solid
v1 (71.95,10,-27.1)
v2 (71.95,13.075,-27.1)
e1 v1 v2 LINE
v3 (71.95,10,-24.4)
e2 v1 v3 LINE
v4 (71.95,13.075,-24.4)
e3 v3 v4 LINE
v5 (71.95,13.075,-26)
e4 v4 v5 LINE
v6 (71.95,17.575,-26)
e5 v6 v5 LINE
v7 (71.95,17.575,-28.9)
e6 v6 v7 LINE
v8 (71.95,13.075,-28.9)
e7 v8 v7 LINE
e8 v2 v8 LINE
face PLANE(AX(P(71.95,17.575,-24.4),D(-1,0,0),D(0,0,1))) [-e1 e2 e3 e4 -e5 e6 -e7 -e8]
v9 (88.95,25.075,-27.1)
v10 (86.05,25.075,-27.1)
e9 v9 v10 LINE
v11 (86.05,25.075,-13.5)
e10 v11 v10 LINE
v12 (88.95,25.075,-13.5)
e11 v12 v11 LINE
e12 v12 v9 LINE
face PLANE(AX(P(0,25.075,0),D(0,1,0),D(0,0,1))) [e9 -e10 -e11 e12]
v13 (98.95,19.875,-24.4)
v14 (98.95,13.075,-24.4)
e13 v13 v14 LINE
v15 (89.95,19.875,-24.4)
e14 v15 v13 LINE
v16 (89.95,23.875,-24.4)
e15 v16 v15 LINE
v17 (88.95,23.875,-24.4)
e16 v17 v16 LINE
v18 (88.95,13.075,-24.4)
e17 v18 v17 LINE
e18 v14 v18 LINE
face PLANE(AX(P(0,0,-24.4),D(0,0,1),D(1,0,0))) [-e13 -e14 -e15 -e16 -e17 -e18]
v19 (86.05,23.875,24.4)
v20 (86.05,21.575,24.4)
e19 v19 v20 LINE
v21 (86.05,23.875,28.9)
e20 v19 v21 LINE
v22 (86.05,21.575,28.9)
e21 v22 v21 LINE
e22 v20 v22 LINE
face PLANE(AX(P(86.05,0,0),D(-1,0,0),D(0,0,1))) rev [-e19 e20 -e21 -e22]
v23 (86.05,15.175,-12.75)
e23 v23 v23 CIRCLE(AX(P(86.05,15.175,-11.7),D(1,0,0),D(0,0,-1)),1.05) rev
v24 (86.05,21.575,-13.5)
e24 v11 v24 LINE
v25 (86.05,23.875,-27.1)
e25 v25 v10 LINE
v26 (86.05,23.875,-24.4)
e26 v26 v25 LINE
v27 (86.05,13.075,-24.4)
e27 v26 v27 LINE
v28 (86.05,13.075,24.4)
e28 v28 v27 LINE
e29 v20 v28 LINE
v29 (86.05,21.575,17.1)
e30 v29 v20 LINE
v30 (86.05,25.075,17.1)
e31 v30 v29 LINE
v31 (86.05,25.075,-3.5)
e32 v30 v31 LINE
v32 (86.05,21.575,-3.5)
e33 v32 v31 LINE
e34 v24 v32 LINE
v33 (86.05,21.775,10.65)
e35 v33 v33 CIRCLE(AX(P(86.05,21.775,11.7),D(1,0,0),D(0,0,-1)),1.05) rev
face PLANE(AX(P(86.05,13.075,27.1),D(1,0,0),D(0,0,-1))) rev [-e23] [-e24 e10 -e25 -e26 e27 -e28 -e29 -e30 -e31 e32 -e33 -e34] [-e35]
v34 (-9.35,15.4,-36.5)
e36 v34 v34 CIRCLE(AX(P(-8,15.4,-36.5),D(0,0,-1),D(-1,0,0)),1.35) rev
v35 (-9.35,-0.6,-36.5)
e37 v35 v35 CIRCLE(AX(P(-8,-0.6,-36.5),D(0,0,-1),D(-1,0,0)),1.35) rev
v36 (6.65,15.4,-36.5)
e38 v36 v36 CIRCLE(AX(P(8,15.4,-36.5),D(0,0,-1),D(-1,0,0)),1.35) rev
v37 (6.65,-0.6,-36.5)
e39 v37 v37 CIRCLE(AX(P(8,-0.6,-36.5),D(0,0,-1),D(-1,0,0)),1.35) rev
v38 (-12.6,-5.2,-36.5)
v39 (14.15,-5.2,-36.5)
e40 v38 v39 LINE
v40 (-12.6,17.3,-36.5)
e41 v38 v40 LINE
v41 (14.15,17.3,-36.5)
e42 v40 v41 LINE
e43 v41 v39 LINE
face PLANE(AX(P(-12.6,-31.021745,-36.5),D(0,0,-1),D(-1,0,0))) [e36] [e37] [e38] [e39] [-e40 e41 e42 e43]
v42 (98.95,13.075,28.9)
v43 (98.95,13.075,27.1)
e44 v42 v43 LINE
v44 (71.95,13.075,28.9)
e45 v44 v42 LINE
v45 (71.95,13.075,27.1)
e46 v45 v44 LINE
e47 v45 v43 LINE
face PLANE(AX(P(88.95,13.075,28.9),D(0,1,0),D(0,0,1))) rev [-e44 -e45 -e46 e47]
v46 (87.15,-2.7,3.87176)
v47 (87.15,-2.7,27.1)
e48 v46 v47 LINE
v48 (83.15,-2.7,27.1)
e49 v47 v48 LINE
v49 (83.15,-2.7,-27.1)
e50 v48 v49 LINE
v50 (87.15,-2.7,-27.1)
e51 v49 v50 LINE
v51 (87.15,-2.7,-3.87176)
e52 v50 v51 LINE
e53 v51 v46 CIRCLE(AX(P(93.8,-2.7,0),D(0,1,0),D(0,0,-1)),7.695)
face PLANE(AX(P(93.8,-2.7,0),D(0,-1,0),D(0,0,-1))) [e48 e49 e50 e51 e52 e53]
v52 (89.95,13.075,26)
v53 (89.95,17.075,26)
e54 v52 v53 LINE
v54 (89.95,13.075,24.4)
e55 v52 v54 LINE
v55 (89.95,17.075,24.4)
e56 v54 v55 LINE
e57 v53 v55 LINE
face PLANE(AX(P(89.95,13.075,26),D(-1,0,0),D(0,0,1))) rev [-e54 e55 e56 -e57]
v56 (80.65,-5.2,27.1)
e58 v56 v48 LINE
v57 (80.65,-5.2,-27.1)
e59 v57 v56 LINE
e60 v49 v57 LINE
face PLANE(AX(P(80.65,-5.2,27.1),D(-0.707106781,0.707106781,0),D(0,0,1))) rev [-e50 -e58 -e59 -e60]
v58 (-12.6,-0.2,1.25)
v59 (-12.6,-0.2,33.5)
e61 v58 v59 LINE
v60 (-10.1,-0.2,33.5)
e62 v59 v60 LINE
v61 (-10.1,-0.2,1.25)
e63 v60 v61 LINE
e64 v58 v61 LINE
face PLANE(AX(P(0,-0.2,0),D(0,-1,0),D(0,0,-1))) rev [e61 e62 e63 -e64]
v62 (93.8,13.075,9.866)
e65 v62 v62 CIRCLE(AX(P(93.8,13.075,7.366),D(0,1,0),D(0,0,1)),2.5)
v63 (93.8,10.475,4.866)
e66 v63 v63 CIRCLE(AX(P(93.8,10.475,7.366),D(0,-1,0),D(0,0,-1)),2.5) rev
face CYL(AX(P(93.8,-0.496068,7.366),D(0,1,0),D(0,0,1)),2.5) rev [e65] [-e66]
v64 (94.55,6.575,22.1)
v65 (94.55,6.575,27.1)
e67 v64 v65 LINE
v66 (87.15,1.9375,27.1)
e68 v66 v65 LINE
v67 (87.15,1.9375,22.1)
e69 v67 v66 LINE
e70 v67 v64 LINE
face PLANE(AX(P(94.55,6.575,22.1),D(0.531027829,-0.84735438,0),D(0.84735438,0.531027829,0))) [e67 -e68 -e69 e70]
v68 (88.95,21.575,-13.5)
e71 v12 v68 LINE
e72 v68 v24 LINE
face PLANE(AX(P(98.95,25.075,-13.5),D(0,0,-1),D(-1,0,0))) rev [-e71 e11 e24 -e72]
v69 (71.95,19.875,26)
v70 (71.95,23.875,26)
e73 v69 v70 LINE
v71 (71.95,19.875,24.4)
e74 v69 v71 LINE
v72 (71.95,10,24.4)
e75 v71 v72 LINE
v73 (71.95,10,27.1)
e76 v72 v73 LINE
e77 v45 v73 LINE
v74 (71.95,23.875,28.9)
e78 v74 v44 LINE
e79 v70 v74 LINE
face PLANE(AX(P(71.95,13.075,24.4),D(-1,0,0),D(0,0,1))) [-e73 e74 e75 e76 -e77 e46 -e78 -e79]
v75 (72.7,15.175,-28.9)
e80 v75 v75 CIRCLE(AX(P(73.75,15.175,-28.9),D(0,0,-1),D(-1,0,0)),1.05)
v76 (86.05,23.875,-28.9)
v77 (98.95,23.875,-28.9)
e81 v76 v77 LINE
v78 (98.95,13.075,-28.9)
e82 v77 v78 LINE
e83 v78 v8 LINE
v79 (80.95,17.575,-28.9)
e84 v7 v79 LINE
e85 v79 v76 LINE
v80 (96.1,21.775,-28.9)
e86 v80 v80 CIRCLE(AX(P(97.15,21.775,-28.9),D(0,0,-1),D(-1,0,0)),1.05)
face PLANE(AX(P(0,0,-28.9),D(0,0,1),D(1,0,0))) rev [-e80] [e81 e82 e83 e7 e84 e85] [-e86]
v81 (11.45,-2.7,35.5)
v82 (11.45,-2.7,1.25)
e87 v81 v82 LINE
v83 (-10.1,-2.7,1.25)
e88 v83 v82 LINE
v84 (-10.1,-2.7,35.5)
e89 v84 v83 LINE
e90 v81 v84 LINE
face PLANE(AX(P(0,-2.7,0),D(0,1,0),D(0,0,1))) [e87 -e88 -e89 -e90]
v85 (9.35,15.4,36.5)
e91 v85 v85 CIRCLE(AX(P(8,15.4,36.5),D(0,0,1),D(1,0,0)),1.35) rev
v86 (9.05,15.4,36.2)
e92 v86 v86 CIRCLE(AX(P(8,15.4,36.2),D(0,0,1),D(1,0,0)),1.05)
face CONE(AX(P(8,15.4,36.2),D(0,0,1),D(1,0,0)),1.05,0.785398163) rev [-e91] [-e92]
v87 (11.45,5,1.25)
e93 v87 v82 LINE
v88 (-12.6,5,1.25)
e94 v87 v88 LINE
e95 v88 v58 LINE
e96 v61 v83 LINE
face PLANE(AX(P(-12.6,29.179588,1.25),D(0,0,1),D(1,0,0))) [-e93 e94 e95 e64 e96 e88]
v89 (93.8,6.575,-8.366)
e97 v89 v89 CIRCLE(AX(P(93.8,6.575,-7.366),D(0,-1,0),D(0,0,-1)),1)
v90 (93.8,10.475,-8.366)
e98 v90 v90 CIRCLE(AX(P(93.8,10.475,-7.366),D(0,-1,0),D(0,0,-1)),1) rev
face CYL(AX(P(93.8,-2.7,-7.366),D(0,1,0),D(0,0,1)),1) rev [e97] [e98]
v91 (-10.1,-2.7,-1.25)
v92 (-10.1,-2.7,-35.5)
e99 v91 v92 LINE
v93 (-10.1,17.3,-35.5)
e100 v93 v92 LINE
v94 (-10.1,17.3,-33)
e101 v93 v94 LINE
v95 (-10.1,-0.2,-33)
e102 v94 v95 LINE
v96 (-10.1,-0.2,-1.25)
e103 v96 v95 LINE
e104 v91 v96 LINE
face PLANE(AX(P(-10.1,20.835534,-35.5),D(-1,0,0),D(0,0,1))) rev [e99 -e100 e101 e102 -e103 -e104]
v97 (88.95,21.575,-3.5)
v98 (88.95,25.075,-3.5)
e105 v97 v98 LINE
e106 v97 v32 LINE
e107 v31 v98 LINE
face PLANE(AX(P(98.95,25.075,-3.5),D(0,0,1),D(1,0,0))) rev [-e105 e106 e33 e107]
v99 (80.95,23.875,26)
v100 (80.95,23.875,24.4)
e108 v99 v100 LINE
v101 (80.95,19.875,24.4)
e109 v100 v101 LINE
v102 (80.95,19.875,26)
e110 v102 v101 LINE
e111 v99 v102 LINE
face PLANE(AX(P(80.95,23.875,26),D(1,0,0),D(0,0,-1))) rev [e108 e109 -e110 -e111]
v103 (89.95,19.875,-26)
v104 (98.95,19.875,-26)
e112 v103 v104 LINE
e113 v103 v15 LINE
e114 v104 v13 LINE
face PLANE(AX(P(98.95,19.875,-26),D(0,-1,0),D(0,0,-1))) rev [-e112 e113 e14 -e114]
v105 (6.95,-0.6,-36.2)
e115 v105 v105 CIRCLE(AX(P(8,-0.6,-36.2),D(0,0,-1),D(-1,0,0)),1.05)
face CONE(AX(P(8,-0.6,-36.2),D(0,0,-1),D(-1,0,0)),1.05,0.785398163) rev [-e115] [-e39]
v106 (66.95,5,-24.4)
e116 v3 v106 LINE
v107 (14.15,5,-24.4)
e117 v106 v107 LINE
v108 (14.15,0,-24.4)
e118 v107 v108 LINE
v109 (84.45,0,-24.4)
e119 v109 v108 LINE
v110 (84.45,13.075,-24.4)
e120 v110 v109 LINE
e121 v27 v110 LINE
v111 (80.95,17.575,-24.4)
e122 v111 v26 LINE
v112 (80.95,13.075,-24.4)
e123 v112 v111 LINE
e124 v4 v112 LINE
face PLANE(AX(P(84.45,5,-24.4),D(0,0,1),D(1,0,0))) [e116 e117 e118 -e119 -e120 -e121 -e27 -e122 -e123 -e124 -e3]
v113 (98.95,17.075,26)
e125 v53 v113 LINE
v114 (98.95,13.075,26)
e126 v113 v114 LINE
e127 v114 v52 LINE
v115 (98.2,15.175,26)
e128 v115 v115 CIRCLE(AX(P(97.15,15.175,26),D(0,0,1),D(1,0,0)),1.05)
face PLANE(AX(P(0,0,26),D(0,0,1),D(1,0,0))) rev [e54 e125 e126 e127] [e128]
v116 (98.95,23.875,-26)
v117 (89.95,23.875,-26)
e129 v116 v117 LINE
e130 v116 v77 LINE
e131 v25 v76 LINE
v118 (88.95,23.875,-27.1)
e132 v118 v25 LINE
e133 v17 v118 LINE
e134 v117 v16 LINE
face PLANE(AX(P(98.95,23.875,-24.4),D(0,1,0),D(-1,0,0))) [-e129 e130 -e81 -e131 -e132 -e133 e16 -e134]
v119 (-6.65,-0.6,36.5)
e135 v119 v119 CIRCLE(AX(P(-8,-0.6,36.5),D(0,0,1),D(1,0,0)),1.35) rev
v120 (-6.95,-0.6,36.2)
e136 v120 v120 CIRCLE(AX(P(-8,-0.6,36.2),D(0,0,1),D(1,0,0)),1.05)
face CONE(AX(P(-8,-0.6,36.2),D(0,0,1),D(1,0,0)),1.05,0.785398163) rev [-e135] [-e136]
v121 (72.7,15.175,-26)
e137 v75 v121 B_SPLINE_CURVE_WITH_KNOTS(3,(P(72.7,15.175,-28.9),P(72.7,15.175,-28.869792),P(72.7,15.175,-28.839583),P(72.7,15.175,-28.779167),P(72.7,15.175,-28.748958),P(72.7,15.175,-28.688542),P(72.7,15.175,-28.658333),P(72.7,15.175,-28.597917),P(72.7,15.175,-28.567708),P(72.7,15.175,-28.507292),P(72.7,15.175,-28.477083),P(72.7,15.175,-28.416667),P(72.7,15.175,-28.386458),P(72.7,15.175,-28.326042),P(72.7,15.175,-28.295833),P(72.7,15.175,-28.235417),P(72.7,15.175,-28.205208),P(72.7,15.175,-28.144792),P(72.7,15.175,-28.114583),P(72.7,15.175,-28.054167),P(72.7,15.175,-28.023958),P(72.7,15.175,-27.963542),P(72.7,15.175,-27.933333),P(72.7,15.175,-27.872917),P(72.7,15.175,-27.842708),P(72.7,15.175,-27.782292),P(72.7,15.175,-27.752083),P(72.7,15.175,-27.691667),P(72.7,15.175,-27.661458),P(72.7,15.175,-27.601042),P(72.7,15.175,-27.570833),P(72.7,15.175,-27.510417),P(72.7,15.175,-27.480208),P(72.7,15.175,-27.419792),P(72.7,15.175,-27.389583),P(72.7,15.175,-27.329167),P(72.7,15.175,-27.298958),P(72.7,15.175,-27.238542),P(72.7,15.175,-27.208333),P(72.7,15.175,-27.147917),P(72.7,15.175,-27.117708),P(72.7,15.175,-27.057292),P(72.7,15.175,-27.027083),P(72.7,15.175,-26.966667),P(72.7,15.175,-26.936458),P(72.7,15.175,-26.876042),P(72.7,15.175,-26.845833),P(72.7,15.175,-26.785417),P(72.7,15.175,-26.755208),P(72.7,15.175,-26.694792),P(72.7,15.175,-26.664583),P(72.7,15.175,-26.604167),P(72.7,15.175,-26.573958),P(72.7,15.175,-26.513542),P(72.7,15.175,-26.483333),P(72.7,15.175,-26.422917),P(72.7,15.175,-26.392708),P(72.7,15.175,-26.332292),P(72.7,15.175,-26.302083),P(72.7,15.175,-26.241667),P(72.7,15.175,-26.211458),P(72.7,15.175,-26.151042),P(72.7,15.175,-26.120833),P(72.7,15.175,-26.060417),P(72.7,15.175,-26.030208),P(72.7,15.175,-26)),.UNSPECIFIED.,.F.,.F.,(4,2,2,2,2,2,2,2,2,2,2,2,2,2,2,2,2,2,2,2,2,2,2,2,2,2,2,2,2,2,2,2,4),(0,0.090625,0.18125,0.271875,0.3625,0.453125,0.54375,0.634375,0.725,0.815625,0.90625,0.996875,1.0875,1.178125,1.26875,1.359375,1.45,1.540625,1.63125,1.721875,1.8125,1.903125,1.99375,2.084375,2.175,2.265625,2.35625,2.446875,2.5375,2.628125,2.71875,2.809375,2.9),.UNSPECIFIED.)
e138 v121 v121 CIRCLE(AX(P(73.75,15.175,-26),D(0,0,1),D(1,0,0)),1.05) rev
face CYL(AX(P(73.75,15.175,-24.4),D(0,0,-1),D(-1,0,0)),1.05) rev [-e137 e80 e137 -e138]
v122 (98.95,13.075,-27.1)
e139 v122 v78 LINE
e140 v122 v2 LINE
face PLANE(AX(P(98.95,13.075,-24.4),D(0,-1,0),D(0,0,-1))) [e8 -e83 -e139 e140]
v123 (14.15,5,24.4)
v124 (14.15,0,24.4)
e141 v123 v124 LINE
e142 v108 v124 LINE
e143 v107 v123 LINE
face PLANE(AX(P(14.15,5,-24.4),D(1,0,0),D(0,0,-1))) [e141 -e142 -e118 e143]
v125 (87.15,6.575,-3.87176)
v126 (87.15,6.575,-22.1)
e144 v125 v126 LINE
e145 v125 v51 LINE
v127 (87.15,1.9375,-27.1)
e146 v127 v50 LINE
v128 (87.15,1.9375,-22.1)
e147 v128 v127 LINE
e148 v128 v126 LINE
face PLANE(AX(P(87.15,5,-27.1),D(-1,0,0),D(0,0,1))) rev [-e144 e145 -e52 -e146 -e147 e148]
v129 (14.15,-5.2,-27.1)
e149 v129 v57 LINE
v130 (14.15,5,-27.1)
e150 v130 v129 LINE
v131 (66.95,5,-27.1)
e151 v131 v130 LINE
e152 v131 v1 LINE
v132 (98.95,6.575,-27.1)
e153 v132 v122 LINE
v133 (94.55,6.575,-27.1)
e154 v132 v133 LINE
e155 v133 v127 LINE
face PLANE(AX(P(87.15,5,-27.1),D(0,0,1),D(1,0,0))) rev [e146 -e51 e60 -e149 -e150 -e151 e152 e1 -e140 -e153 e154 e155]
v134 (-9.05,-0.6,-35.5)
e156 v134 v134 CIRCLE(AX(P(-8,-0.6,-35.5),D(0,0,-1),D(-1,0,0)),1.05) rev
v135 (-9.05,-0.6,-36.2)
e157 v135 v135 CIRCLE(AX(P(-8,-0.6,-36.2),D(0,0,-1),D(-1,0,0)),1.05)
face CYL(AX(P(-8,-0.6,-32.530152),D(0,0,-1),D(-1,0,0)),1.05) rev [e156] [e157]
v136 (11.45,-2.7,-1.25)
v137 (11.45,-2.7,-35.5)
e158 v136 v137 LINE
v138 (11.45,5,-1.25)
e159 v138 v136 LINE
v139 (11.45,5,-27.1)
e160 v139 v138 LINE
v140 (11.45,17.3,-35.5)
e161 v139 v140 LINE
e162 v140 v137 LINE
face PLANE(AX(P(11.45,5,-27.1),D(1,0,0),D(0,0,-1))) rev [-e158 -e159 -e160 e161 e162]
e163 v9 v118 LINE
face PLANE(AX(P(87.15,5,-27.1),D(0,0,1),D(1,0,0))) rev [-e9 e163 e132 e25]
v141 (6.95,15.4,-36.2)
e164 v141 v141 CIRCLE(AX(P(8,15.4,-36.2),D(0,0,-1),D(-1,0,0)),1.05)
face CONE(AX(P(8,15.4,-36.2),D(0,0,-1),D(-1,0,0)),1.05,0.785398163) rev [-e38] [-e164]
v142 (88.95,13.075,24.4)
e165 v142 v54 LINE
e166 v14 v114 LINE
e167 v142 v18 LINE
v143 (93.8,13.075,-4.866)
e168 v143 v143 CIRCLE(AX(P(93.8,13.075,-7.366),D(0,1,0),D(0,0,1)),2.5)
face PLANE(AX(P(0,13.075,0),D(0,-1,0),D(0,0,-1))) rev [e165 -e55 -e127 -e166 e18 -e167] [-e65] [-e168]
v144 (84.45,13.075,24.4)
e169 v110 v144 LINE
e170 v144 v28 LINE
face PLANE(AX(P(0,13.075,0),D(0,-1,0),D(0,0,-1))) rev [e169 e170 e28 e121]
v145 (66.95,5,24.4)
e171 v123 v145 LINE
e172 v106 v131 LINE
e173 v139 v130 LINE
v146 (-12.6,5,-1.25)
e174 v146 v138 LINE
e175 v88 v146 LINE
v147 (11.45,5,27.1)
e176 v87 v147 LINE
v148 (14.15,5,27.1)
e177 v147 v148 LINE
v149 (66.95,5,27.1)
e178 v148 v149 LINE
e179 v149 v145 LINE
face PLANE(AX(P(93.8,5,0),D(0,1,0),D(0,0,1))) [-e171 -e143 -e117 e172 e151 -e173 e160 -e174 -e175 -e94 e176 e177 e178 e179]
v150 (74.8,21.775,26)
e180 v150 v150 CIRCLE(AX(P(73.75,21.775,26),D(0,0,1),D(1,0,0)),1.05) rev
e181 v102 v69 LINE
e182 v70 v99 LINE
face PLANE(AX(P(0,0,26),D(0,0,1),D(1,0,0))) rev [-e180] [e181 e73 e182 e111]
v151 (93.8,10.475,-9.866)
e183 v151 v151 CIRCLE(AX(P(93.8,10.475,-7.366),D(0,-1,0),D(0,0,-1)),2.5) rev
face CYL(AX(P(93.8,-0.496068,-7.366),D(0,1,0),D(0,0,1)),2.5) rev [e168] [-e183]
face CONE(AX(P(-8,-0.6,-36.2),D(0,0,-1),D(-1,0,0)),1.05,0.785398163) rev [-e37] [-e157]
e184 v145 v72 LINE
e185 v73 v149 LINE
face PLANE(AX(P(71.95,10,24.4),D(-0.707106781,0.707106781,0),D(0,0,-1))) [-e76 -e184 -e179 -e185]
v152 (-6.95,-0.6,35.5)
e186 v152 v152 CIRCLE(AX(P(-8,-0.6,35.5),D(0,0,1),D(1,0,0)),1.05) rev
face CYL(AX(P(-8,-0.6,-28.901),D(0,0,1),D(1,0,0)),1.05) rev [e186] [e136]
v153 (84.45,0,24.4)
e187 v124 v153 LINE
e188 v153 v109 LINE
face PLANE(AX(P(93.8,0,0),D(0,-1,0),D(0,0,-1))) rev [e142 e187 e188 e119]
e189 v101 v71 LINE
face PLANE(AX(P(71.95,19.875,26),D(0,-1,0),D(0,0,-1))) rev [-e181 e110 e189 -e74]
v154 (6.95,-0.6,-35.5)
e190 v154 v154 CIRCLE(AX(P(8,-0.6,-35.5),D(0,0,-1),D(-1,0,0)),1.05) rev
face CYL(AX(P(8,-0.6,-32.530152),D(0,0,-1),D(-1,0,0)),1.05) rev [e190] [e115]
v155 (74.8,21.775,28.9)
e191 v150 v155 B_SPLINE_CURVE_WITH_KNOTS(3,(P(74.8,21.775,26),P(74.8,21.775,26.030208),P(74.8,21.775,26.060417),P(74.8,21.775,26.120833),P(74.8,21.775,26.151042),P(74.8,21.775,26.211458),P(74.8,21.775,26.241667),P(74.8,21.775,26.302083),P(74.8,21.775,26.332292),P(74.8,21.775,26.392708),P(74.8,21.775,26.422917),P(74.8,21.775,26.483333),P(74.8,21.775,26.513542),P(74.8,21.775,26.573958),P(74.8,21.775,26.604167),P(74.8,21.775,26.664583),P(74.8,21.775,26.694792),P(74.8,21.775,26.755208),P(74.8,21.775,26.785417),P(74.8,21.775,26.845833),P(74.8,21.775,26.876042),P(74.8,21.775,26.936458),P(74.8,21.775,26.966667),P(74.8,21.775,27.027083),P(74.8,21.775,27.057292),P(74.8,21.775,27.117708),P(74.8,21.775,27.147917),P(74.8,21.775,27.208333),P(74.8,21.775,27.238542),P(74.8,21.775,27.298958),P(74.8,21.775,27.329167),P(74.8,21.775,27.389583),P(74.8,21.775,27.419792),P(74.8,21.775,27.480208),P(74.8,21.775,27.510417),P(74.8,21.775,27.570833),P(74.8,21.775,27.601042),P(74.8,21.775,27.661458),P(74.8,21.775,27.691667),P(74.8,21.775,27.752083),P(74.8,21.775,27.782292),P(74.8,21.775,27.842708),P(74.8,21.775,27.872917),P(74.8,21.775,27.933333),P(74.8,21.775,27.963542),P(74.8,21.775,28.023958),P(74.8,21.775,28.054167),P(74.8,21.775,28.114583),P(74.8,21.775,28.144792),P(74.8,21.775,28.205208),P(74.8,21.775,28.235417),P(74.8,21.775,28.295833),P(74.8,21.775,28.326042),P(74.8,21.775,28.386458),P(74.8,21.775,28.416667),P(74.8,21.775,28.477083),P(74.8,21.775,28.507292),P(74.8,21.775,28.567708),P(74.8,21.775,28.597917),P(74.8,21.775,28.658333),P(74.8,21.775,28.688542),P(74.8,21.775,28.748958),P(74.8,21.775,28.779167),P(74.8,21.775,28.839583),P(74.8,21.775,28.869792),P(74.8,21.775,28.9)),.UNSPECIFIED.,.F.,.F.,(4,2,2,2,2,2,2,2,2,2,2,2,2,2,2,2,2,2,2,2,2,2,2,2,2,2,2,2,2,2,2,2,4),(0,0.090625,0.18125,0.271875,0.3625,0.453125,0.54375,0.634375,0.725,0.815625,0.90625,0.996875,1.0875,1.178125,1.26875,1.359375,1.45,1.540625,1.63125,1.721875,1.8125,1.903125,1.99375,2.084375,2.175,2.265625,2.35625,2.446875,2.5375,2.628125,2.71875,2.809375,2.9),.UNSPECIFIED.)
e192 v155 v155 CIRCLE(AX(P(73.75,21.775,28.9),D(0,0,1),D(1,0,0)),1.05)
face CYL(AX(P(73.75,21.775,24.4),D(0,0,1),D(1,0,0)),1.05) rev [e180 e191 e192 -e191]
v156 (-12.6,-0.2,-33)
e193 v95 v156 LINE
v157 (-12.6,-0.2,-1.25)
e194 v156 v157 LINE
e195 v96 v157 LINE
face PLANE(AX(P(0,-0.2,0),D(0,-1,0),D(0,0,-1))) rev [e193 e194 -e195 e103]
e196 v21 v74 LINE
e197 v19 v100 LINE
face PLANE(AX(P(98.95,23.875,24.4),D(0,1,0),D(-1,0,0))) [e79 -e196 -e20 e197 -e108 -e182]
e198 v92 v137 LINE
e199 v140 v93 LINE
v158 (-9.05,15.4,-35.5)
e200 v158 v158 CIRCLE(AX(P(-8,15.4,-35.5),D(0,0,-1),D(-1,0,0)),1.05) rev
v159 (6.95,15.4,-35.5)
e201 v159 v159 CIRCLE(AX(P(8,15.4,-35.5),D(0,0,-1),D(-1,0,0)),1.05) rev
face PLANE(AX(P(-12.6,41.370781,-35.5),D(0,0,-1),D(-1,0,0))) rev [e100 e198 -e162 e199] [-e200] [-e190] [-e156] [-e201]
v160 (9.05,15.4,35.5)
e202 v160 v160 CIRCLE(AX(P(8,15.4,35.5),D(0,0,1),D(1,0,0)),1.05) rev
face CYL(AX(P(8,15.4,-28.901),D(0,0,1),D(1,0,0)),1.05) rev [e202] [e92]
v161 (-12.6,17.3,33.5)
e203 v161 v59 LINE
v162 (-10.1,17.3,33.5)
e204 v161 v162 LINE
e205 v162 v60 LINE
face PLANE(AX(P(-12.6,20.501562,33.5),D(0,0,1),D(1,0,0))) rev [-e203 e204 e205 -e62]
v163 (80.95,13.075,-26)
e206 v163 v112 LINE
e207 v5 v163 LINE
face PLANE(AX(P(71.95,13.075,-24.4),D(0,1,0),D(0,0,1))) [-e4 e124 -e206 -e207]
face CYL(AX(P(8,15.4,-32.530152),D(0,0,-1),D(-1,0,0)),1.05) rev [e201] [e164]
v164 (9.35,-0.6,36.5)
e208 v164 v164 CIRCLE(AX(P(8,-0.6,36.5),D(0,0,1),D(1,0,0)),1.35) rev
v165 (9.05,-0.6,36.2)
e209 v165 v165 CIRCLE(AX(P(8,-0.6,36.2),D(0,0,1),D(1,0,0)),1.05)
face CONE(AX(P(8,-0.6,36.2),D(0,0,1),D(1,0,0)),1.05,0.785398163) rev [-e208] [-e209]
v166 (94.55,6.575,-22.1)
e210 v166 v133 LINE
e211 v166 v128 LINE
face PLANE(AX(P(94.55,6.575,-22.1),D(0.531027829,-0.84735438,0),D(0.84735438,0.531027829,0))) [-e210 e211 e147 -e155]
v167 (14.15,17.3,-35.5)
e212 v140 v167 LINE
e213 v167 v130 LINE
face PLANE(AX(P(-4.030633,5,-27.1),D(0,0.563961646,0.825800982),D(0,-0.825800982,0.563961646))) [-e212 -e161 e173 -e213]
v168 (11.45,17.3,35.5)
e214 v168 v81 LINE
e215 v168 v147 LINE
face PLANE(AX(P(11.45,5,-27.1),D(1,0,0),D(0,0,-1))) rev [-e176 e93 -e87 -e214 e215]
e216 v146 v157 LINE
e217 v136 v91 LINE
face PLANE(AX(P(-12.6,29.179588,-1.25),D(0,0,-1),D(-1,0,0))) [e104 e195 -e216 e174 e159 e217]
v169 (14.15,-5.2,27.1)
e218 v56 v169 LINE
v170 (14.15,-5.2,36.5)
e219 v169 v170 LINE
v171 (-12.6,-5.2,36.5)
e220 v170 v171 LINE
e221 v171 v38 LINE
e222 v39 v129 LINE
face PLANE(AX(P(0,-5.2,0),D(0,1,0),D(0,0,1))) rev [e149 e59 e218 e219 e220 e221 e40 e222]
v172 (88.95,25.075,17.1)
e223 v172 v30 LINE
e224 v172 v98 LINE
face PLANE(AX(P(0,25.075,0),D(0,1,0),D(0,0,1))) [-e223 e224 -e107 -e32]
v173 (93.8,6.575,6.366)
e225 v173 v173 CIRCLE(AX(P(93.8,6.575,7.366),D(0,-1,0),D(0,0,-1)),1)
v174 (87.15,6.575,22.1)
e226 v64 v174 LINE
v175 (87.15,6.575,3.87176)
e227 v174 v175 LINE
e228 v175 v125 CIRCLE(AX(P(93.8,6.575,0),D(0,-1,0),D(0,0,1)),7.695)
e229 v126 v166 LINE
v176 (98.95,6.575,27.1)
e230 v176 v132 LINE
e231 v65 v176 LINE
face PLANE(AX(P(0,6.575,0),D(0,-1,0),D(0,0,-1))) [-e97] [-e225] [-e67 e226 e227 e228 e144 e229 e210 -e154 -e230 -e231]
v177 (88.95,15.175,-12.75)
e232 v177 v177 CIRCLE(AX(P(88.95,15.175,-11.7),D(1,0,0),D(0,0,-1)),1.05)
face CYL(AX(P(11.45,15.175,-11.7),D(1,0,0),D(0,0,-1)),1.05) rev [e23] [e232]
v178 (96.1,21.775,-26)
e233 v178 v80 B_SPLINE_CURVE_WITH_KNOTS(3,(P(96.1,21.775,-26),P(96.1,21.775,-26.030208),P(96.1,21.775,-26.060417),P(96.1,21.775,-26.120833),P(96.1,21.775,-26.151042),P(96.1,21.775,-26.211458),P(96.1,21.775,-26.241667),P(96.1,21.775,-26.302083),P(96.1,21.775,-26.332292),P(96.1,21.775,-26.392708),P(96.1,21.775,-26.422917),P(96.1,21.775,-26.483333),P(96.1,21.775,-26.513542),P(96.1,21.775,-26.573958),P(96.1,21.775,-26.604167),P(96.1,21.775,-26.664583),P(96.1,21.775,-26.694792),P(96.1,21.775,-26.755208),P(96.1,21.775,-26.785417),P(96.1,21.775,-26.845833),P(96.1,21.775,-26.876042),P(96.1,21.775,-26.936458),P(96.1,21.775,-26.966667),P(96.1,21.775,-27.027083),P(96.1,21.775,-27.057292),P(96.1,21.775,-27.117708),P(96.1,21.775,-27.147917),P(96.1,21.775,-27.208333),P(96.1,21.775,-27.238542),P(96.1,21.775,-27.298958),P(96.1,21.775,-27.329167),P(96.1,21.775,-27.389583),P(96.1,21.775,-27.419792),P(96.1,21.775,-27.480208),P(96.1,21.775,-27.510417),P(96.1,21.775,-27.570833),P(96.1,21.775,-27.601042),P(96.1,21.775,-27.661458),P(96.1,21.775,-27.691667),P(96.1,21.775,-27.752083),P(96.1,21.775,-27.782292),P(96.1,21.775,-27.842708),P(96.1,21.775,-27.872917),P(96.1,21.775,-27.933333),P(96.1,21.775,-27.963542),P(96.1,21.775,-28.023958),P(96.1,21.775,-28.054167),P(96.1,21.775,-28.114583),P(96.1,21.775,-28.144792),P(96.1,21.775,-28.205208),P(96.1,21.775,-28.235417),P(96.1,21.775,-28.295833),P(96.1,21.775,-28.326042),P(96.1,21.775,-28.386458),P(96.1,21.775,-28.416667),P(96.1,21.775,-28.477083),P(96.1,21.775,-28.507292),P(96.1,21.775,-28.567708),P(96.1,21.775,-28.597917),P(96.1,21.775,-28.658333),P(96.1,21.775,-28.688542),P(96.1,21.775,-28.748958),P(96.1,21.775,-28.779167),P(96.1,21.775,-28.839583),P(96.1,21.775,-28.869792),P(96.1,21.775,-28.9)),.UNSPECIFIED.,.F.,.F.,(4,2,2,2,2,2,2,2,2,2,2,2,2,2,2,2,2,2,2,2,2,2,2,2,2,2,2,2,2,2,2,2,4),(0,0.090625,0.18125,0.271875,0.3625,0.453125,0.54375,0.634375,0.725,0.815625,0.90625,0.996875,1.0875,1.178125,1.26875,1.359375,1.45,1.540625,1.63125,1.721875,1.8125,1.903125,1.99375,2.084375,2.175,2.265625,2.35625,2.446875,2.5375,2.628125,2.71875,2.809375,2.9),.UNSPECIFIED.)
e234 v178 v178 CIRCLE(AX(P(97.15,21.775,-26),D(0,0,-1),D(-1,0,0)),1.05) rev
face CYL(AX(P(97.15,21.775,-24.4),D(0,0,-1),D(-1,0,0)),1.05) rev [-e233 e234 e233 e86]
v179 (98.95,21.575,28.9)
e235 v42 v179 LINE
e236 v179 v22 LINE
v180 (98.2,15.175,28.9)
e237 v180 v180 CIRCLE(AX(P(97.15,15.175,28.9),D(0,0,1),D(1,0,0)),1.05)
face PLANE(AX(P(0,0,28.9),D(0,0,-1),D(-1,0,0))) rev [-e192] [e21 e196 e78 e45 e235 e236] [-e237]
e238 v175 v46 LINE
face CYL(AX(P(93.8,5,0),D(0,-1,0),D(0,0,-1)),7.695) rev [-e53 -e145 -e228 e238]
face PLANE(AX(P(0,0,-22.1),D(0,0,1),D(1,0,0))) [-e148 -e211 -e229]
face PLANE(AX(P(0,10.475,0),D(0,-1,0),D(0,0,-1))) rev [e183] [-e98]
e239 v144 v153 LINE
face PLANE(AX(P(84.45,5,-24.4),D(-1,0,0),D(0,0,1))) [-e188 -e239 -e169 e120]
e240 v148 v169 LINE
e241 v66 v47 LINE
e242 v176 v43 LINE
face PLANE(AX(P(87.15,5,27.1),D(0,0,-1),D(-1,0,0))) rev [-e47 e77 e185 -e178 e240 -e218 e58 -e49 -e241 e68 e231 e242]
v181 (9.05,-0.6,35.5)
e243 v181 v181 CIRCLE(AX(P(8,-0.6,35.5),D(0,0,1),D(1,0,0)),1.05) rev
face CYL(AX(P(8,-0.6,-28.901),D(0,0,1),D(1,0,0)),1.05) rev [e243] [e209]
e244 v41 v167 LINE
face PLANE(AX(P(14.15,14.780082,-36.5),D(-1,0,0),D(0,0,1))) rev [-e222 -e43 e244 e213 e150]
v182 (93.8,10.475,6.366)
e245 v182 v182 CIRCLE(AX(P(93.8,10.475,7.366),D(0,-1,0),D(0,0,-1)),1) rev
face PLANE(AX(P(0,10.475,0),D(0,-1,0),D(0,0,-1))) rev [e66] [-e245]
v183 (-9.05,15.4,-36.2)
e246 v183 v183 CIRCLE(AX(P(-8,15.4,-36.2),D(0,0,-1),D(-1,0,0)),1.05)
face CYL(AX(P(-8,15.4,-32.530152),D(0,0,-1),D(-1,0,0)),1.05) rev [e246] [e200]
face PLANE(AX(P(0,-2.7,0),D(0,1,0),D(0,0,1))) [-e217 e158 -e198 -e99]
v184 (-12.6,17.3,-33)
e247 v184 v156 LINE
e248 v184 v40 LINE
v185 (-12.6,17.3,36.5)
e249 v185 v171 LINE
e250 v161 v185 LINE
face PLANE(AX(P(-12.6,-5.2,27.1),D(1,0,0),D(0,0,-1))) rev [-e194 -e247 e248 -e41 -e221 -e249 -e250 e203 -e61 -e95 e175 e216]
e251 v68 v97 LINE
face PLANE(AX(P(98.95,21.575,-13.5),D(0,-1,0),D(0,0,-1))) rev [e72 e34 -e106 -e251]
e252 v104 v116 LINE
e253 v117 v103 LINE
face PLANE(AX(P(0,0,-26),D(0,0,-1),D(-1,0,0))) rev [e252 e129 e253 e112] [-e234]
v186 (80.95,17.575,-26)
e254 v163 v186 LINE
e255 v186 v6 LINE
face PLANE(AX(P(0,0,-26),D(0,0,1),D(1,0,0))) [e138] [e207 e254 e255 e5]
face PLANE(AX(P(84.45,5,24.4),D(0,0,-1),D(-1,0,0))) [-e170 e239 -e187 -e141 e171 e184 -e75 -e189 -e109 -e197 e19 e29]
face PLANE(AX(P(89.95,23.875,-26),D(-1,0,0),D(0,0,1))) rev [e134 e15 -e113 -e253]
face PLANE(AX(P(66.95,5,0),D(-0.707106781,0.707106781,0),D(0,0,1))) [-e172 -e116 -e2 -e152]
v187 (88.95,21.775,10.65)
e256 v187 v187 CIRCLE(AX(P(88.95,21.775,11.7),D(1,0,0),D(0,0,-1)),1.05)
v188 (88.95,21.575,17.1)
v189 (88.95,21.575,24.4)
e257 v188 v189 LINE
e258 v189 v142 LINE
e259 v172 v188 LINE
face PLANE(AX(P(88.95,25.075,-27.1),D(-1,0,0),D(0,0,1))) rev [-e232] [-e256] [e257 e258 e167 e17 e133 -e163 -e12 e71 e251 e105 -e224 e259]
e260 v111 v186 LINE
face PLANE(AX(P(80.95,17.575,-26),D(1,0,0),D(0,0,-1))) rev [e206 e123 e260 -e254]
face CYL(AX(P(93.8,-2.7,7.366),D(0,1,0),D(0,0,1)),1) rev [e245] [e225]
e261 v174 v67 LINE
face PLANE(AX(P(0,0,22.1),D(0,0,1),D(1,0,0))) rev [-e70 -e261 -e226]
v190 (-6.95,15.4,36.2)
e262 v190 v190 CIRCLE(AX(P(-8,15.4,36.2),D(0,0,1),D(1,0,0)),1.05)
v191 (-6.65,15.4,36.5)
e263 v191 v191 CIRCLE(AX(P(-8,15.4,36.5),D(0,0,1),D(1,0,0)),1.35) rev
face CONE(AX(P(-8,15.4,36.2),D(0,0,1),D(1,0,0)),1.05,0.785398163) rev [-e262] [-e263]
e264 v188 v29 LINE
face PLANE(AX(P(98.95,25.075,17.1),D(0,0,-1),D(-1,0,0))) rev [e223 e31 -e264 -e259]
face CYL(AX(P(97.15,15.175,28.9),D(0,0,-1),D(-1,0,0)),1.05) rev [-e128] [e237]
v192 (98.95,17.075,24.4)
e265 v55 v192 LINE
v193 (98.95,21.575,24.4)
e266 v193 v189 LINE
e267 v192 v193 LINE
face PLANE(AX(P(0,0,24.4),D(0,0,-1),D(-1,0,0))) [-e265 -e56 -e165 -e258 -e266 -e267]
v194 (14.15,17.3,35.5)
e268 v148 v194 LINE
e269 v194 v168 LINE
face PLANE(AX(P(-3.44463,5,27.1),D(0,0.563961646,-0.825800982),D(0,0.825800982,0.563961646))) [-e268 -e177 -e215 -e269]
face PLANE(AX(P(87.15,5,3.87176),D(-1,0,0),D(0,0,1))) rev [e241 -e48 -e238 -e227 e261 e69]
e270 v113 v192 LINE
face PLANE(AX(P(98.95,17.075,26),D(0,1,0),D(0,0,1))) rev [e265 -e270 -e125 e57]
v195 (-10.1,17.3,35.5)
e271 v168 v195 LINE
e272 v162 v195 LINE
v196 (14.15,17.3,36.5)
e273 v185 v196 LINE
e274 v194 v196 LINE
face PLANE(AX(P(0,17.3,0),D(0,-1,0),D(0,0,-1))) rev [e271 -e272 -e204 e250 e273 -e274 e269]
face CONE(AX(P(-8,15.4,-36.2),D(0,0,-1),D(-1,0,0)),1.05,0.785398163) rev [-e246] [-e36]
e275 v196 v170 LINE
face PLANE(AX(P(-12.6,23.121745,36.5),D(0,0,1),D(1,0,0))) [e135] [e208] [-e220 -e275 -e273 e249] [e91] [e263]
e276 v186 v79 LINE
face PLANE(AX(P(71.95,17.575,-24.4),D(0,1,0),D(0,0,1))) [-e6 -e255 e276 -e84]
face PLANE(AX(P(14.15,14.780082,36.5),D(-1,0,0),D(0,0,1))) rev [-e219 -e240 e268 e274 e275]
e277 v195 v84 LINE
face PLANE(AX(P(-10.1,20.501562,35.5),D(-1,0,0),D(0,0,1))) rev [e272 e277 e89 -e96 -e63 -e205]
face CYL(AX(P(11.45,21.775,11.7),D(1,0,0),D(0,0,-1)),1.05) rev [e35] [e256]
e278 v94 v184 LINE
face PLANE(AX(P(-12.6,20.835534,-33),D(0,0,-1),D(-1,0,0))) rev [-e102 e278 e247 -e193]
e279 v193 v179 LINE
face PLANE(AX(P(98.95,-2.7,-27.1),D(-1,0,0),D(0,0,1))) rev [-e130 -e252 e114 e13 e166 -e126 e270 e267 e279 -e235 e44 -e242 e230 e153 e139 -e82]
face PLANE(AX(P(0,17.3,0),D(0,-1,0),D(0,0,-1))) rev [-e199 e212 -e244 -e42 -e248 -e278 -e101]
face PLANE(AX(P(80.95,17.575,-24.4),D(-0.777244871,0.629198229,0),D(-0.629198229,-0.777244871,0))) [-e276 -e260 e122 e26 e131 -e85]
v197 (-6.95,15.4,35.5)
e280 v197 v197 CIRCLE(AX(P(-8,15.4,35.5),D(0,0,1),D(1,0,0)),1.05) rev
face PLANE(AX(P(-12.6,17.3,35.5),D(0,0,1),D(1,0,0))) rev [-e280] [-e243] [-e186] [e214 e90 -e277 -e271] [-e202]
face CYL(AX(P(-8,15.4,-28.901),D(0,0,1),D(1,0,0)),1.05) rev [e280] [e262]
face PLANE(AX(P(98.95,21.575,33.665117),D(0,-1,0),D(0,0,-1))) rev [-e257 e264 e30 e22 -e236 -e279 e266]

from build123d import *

# Parameters (mm, degrees)
SKETCH5_W                 = 70.3
SKETCH5_H                 = 48.8
BOSS_EXTRUDE2_DEPTH       = 5
BOSS_EXTRUDE4_START       = 2.7
BOSS_EXTRUDE4_DEPTH       = 2.7
BOSS_EXTRUDE5_DEPTH       = 1.575
SKETCH8_W                 = 17.5
SKETCH8_H                 = 54.2
BOSS_EXTRUDE6_DEPTH       = 6.5
BOSS_EXTRUDE7_DEPTH       = 54.2
SKETCH10_W                = 70.3
SKETCH10_H                = 48.8
CUT_EXTRUDE1_DEPTH        = 107.297545244
BOSS_EXTRUDE8_DEPTH       = 5
BOSS_EXTRUDE9_DEPTH       = 5
SKETCH13_W                = 4.5
SKETCH13_H                = 54.2
BOSS_EXTRUDE10_DEPTH      = 12
SKETCH15_R                = 1
CUT_EXTRUDE3_DEPTH        = 107.663316679
SKETCH16_R                = 2.5
CUT_EXTRUDE4_DEPTH        = 2.6
SKETCH17_W                = 3
SKETCH17_H                = 54.2
CUT_EXTRUDE5_DEPTH        = 107.663316679
SKETCH18_W                = 10
SKETCH18_H                = 3.5
CUT_EXTRUDE6_DEPTH        = 82.805657659
SKETCH19_R                = 1.05
CUT_EXTRUDE7_DEPTH        = 86.845300541
SKETCH20_W                = 1.6
SKETCH20_H                = 54.2
CUT_EXTRUDE8_DEPTH        = 12
BOSS_EXTRUDE11_DEPTH      = 1.8
BOSS_EXTRUDE11_DEPTH_BACK = 2.7
SKETCH21_W                = 10
SKETCH21_H                = 5
SKETCH21_R                = 1.05
BOSS_EXTRUDE13_DEPTH      = 1.8
BOSS_EXTRUDE13_DEPTH_BACK = 2.7
SKETCH23_W                = 27
SKETCH23_H                = 10.8
SKETCH23_R                = 1.05
CUT_EXTRUDE9_DEPTH        = 84.839880874
SKETCH24_W                = 13.5
SKETCH24_H                = 8.075
BOSS_EXTRUDE14_DEPTH      = 2.7
BOSS_EXTRUDE15_DEPTH      = 1.8
BOSS_EXTRUDE15_DEPTH_BACK = 2.7
SKETCH25_R                = 1.05
SKETCH26_W                = 9
SKETCH26_H                = 4.5
CUT_EXTRUDE10_DEPTH       = 1.6
SKETCH27_W                = 9
SKETCH27_H                = 4
CUT_EXTRUDE11_DEPTH       = 1.6
SKETCH28_W                = 9
SKETCH28_H                = 4
CUT_EXTRUDE12_DEPTH       = 1.6
SKETCH29_W                = 9
SKETCH29_H                = 4
CUT_EXTRUDE13_DEPTH       = 1.6
SKETCH30_W                = 14.720747113
SKETCH30_H                = 8.075
BOSS_EXTRUDE16_DEPTH      = 2.7
SKETCH31_W                = 93.25
SKETCH31_H                = 54.2
BOSS_EXTRUDE17_DEPTH      = 2.5
SKETCH33_W                = 24.05
SKETCH33_H                = 2.5
BOSS_EXTRUDE18_DEPTH      = 10.2
SKETCH36_W                = 24.05
SKETCH36_H                = 9.4
BOSS_EXTRUDE20_DEPTH      = 2.5
SKETCH37_W                = 24.05
SKETCH37_H                = 1
BOSS_EXTRUDE21_DEPTH      = 20
CUT_EXTRUDE14_REACH       = 123.231
SKETCH38_R                = 1.05
BOSS_EXTRUDE22_START      = -2.5
SKETCH39_W                = 2.7
SKETCH39_H                = 9.4
BOSS_EXTRUDE22_DEPTH      = 10.2
SKETCH40_W                = 2.7
SKETCH40_H                = 1
BOSS_EXTRUDE23_DEPTH      = 12.3
BOSS_EXTRUDE24_DEPTH      = 2.7
SKETCH42_W                = 2.5
SKETCH42_H                = 2
BOSS_EXTRUDE25_DEPTH      = 20
SKETCH43_W                = 24.05
SKETCH43_H                = 9.4
BOSS_EXTRUDE26_DEPTH      = 2.5
SKETCH44_W                = 24.05
SKETCH44_H                = 1
BOSS_EXTRUDE27_DEPTH      = 20
BOSS_EXTRUDE30_START      = -2.5
SKETCH45_W                = 2.7
SKETCH45_H                = 9.4
BOSS_EXTRUDE30_DEPTH      = 10.2
BOSS_EXTRUDE31_DEPTH      = 2.7
SKETCH47_W                = 2.5
SKETCH47_H                = 2.5
BOSS_EXTRUDE32_DEPTH      = 20
CUT_EXTRUDE15_START       = -1
SKETCH48_R                = 1.05
CUT_EXTRUDE15_DEPTH       = 1
SKETCH49_W                = 2.5
SKETCH49_H                = 66.5
BOSS_EXTRUDE33_DEPTH      = 2.5
CHAMFER1_SIZE             = 0.3
CHAMFER2_SIZE             = 2.5
CHAMFER3_SIZE             = 5


with BuildPart() as part:
    # Sketch5 → Boss-Extrude2 (new body)
    with BuildSketch(Plane(origin=(0, 0, 0), x_dir=(1, 0, 0), z_dir=(0, 1, 0))):
        with BuildLine():
            Line((87.15, 27.1), (11.45, 27.1))
            Line((11.45, 27.1), (11.45, -27.1))
            Line((11.45, -27.1), (87.15, -27.1))
            Line((87.15, -27.1), (87.15, -3.871759936))
            ThreePointArc((87.15, -3.871759936), (86.105, 0), (87.15, 3.871759936))
            Line((87.15, 3.871759936), (87.15, 27.1))
        make_face()
        with Locations((49.3, 0)):
            Rectangle(SKETCH5_W, SKETCH5_H, mode=Mode.SUBTRACT)
    extrude(amount=BOSS_EXTRUDE2_DEPTH)

    # Sketch6 → Boss-Extrude4 (add)
    with BuildSketch(Plane.XZ.offset(BOSS_EXTRUDE4_START)):
        with BuildLine():
            Line((87.15, -3.871759936), (87.15, -27.1))
            Line((87.15, -27.1), (11.45, -27.1))
            Line((11.45, -27.1), (11.45, 27.1))
            Line((11.45, 27.1), (87.15, 27.1))
            Line((87.15, 27.1), (87.15, 3.871759936))
            ThreePointArc((87.15, 3.871759936), (86.105, 0), (87.15, -3.871759936))
        make_face()
    extrude(amount=-BOSS_EXTRUDE4_DEPTH)

    # Sketch7 → Boss-Extrude5 (add)
    with BuildSketch(Plane(origin=(0, 5, 0), x_dir=(1, 0, 0), z_dir=(0, 1, 0))):
        with BuildLine():
            Line((87.15, -27.1), (79.15, -27.1))
            Line((79.15, -27.1), (79.15, -24.4))
            Line((79.15, -24.4), (84.45, -24.4))
            Line((84.45, -24.4), (84.45, 24.4))
            Line((84.45, 24.4), (79.15, 24.4))
            Line((79.15, 24.4), (79.15, 27.1))
            Line((79.15, 27.1), (87.15, 27.1))
            Line((87.15, 27.1), (87.15, 3.871759936))
            ThreePointArc((87.15, 3.871759936), (86.105, 0), (87.15, -3.871759936))
            Line((87.15, -3.871759936), (87.15, -27.1))
        make_face()
    extrude(amount=BOSS_EXTRUDE5_DEPTH)

    # Sketch8 → Boss-Extrude6 (add)
    with BuildSketch(Plane(origin=(0, 6.575, 0), x_dir=(1, 0, 0), z_dir=(0, 1, 0))):
        with Locations((93.2, 0)):
            Rectangle(SKETCH8_W, SKETCH8_H)
    extrude(amount=BOSS_EXTRUDE6_DEPTH)

    # Sketch9 → Boss-Extrude7 (add, through all)
    with BuildSketch(Plane.XY.offset(27.1)):
        Polygon((84.45, 13.075), (79.15, 6.575), (84.45, 6.575), align=None)
    extrude(amount=-BOSS_EXTRUDE7_DEPTH)

    # Sketch10 → Cut-Extrude1 (cut, through all)
    with BuildSketch(Plane(origin=(0, 0, 0), x_dir=(1, 0, 0), z_dir=(0, 1, 0))):
        with Locations((49.3, 0)):
            Rectangle(SKETCH10_W, SKETCH10_H)
    extrude(amount=CUT_EXTRUDE1_DEPTH, mode=Mode.SUBTRACT)

    # Sketch11 → Boss-Extrude8 (add)
    with BuildSketch(Plane.XY.offset(27.1)):
        Polygon((94.55, 6.575), (87.15, 1.9375), (87.15, 6.575), align=None)
    extrude(amount=-BOSS_EXTRUDE8_DEPTH)

    # Sketch12 → Boss-Extrude9 (add)
    with BuildSketch(Plane(origin=(0, 0, -27.1), x_dir=(-1, 0, 0), z_dir=(0, 0, -1))):
        Polygon((-94.55, 6.575), (-87.15, 1.9375), (-87.15, 6.575), align=None)
    extrude(amount=-BOSS_EXTRUDE9_DEPTH)

    # Sketch13 → Boss-Extrude10 (add)
    with BuildSketch(Plane(origin=(0, 13.075, 0), x_dir=(1, 0, 0), z_dir=(0, 1, 0))):
        with Locations((86.7, 0)):
            Rectangle(SKETCH13_W, SKETCH13_H)
    extrude(amount=BOSS_EXTRUDE10_DEPTH)

    # Sketch15 → Cut-Extrude3 (cut, through all)
    with BuildSketch(Plane(origin=(0, 13.075, 0), x_dir=(1, 0, 0), z_dir=(0, 1, 0))):
        with Locations(Location((93.8, 7.366, 0), (0, 0, 270))):
            Circle(SKETCH15_R)
        with Locations(Location((93.8, -7.366, 0), (0, 0, 270))):
            Circle(SKETCH15_R)
    extrude(amount=-CUT_EXTRUDE3_DEPTH, mode=Mode.SUBTRACT)

    # Sketch16 → Cut-Extrude4 (cut)
    with BuildSketch(Plane(origin=(0, 13.075, 0), x_dir=(1, 0, 0), z_dir=(0, 1, 0))):
        with Locations(Location((93.8, 7.366, 0), (0, 0, 270))):
            Circle(SKETCH16_R)
        with Locations(Location((93.8, -7.366, 0), (0, 0, 270))):
            Circle(SKETCH16_R)
    extrude(amount=-CUT_EXTRUDE4_DEPTH, mode=Mode.SUBTRACT)

    # Sketch17 → Cut-Extrude5 (cut, through all)
    with BuildSketch(Plane(origin=(0, 13.075, 0), x_dir=(1, 0, 0), z_dir=(0, 1, 0))):
        with Locations((100.45, 0)):
            Rectangle(SKETCH17_W, SKETCH17_H)
    extrude(amount=-CUT_EXTRUDE5_DEPTH, mode=Mode.SUBTRACT)

    # Sketch18 → Cut-Extrude6 (cut, through all)
    with BuildSketch(Plane.ZY.offset(-84.45)):
        with Locations((-8.5, 23.325)):
            Rectangle(SKETCH18_W, SKETCH18_H)
    extrude(amount=-CUT_EXTRUDE6_DEPTH, mode=Mode.SUBTRACT)

    # Sketch19 → Cut-Extrude7 (cut, through all)
    with BuildSketch(Plane(origin=(88.95, 0, 0), x_dir=(0, 0, -1), z_dir=(1, 0, 0))):
        with Locations((-11.7, 21.775)):
            Circle(SKETCH19_R)
        with Locations((11.7, 15.175)):
            Circle(SKETCH19_R)
    extrude(amount=-CUT_EXTRUDE7_DEPTH, mode=Mode.SUBTRACT)

    # Sketch20 → Cut-Extrude8 (cut)
    with BuildSketch(Plane(origin=(0, 25.075, 0), x_dir=(1, 0, 0), z_dir=(0, 1, 0))):
        with Locations((85.25, 0)):
            Rectangle(SKETCH20_W, SKETCH20_H)
    extrude(amount=-CUT_EXTRUDE8_DEPTH, mode=Mode.SUBTRACT)

    # Sketch21 → Boss-Extrude11 (add, two sides: drawn at the far end of the back side and taken through both)
    with BuildSketch(Plane.XY.offset(27.1).offset(-BOSS_EXTRUDE11_DEPTH_BACK)):
        with Locations((93.95, 15.575)):
            Rectangle(SKETCH21_W, SKETCH21_H)
        with Locations((97.15, 15.175)):
            Circle(SKETCH21_R, mode=Mode.SUBTRACT)
    extrude(amount=BOSS_EXTRUDE11_DEPTH + BOSS_EXTRUDE11_DEPTH_BACK)

    # Sketch23 → Boss-Extrude13 (add, two sides: drawn at the far end of the back side and taken through both)
    with BuildSketch(Plane.XY.offset(27.1).offset(-BOSS_EXTRUDE13_DEPTH_BACK)):
        with Locations((85.45, 18.475)):
            Rectangle(SKETCH23_W, SKETCH23_H)
        with Locations((73.75, 21.775)):
            Circle(SKETCH23_R, mode=Mode.SUBTRACT)
        with Locations((97.15, 15.175)):
            Circle(SKETCH23_R, mode=Mode.SUBTRACT)
    extrude(amount=BOSS_EXTRUDE13_DEPTH + BOSS_EXTRUDE13_DEPTH_BACK)

    # Sketch22 → Cut-Extrude9 (cut, through all)
    with BuildSketch(Plane.ZY.offset(-86.05)):
        Polygon((27.1, 25.075), (33.66511691, 25.075), (33.66511691, 21.575), (27.1, 21.575), (17.1, 21.575), (17.1, 25.075), align=None)
    extrude(amount=-CUT_EXTRUDE9_DEPTH, mode=Mode.SUBTRACT)

    # Sketch24 → Boss-Extrude14 (add)
    with BuildSketch(Plane.XY.offset(27.1)):
        with Locations((78.7, 9.0375)):
            Rectangle(SKETCH24_W, SKETCH24_H)
    extrude(amount=-BOSS_EXTRUDE14_DEPTH)

    # Sketch25 → Boss-Extrude15 (add, two sides: drawn at the far end of the back side and taken through both)
    with BuildSketch(Plane(origin=(0, 0, -27.1), x_dir=(-1, 0, 0), z_dir=(0, 0, -1)).offset(-BOSS_EXTRUDE15_DEPTH_BACK)):
        Polygon((-98.95, 13.075), (-71.95, 13.075), (-71.95, 17.575), (-80.95, 17.575), (-86.05, 23.875), (-98.95, 23.875), align=None)
        with Locations((-97.15, 21.775)):
            Circle(SKETCH25_R, mode=Mode.SUBTRACT)
        with Locations((-73.75, 15.175)):
            Circle(SKETCH25_R, mode=Mode.SUBTRACT)
    extrude(amount=BOSS_EXTRUDE15_DEPTH + BOSS_EXTRUDE15_DEPTH_BACK)

    # Sketch26 → Cut-Extrude10 (cut)
    with BuildSketch(Plane.XY.offset(-24.4)):
        with Locations((76.45, 15.325)):
            Rectangle(SKETCH26_W, SKETCH26_H)
    extrude(amount=-CUT_EXTRUDE10_DEPTH, mode=Mode.SUBTRACT)

    # Sketch27 → Cut-Extrude11 (cut)
    with BuildSketch(Plane(origin=(0, 0, 24.4), x_dir=(-1, 0, 0), z_dir=(0, 0, -1))):
        with Locations((-76.45, 21.875)):
            Rectangle(SKETCH27_W, SKETCH27_H)
    extrude(amount=-CUT_EXTRUDE11_DEPTH, mode=Mode.SUBTRACT)

    # Sketch28 → Cut-Extrude12 (cut)
    with BuildSketch(Plane.XY.offset(-24.4)):
        with Locations((94.45, 21.875)):
            Rectangle(SKETCH28_W, SKETCH28_H)
    extrude(amount=-CUT_EXTRUDE12_DEPTH, mode=Mode.SUBTRACT)

    # Sketch29 → Cut-Extrude13 (cut)
    with BuildSketch(Plane(origin=(0, 0, 24.4), x_dir=(-1, 0, 0), z_dir=(0, 0, -1))):
        with Locations((-94.45, 15.075)):
            Rectangle(SKETCH29_W, SKETCH29_H)
    extrude(amount=-CUT_EXTRUDE13_DEPTH, mode=Mode.SUBTRACT)

    # Sketch30 → Boss-Extrude16 (add)
    with BuildSketch(Plane(origin=(0, 0, -27.1), x_dir=(-1, 0, 0), z_dir=(0, 0, -1))):
        with Locations((-79.310373556, 9.0375)):
            Rectangle(SKETCH30_W, SKETCH30_H)
    extrude(amount=-BOSS_EXTRUDE16_DEPTH)

    # Sketch31 → Boss-Extrude17 (add)
    with BuildSketch(Plane.XZ.offset(2.7)):
        with Locations((34.025, 0)):
            Rectangle(SKETCH31_W, SKETCH31_H)
    extrude(amount=BOSS_EXTRUDE17_DEPTH)

    # Sketch33 → Boss-Extrude18 (add)
    with BuildSketch(Plane.XZ.offset(5.2)):
        with Locations((-0.575, 0)):
            Rectangle(SKETCH33_W, SKETCH33_H)
    extrude(amount=-BOSS_EXTRUDE18_DEPTH)

    # Sketch36 → Boss-Extrude20 (add)
    with BuildSketch(Plane.XZ.offset(5.2)):
        with Locations((-0.575, 31.8)):
            Rectangle(SKETCH36_W, SKETCH36_H)
    extrude(amount=-BOSS_EXTRUDE20_DEPTH)

    # Sketch37 → Boss-Extrude21 (add)
    with BuildSketch(Plane(origin=(0, -2.7, 0), x_dir=(1, 0, 0), z_dir=(0, 1, 0))):
        with Locations((-0.575, -36)):
            Rectangle(SKETCH37_W, SKETCH37_H)
    extrude(amount=BOSS_EXTRUDE21_DEPTH)

    # Sketch38 → Cut-Extrude14 (cut, up to next)
    with BuildSketch(Plane.XY.offset(36.5), mode=Mode.PRIVATE) as cut_extrude14_sk1:
        with Locations((8, 15.4)):
            Circle(SKETCH38_R)
    cut_extrude14_tool1 = extrude(cut_extrude14_sk1.sketch, amount=-CUT_EXTRUDE14_REACH, mode=Mode.PRIVATE) & part.part
    # Sketch38 → Cut-Extrude14 (cut, up to next)
    with BuildSketch(Plane.XY.offset(36.5), mode=Mode.PRIVATE) as cut_extrude14_sk2:
        with Locations((8, -0.6)):
            Circle(SKETCH38_R)
    cut_extrude14_tool2 = extrude(cut_extrude14_sk2.sketch, amount=-CUT_EXTRUDE14_REACH, mode=Mode.PRIVATE) & part.part
    # Sketch38 → Cut-Extrude14 (cut, up to next)
    with BuildSketch(Plane.XY.offset(36.5), mode=Mode.PRIVATE) as cut_extrude14_sk3:
        with Locations((-8, 15.4)):
            Circle(SKETCH38_R)
    cut_extrude14_tool3 = extrude(cut_extrude14_sk3.sketch, amount=-CUT_EXTRUDE14_REACH, mode=Mode.PRIVATE) & part.part
    # Sketch38 → Cut-Extrude14 (cut, up to next)
    with BuildSketch(Plane.XY.offset(36.5), mode=Mode.PRIVATE) as cut_extrude14_sk4:
        with Locations((-8, -0.6)):
            Circle(SKETCH38_R)
    cut_extrude14_tool4 = extrude(cut_extrude14_sk4.sketch, amount=-CUT_EXTRUDE14_REACH, mode=Mode.PRIVATE) & part.part
    add(cut_extrude14_tool1.solids().sort_by_distance((8, 15.4, 36.5))[0], mode=Mode.SUBTRACT)
    add(cut_extrude14_tool2.solids().sort_by_distance((8, -0.6, 36.5))[0], mode=Mode.SUBTRACT)
    add(cut_extrude14_tool3.solids().sort_by_distance((-8, 15.4, 36.5))[0], mode=Mode.SUBTRACT)
    add(cut_extrude14_tool4.solids().sort_by_distance((-8, -0.6, 36.5))[0], mode=Mode.SUBTRACT)

    # Sketch39 → Boss-Extrude22 (add)
    with BuildSketch(Plane(origin=(0, -2.7, 0), x_dir=(1, 0, 0), z_dir=(0, 1, 0)).offset(BOSS_EXTRUDE22_START)):
        with Locations((12.8, -31.8)):
            Rectangle(SKETCH39_W, SKETCH39_H)
    extrude(amount=BOSS_EXTRUDE22_DEPTH)

    # Sketch40 → Boss-Extrude23 (add)
    with BuildSketch(Plane(origin=(0, 5, 0), x_dir=(1, 0, 0), z_dir=(0, 1, 0))):
        with Locations((12.8, -36)):
            Rectangle(SKETCH40_W, SKETCH40_H)
    extrude(amount=BOSS_EXTRUDE23_DEPTH)

    # Sketch41 → Boss-Extrude24 (add)
    with BuildSketch(Plane(origin=(14.15, 0, 0), x_dir=(0, 0, -1), z_dir=(1, 0, 0))):
        Polygon((-27.1, 5), (-35.5, 17.3), (-35.5, 5), align=None)
    extrude(amount=-BOSS_EXTRUDE24_DEPTH)

    # Sketch42 → Boss-Extrude25 (add)
    with BuildSketch(Plane(origin=(0, -2.7, 0), x_dir=(1, 0, 0), z_dir=(0, 1, 0))):
        with Locations((-11.35, -34.5)):
            Rectangle(SKETCH42_W, SKETCH42_H)
    extrude(amount=BOSS_EXTRUDE25_DEPTH)

    # Sketch43 → Boss-Extrude26 (add)
    with BuildSketch(Plane(origin=(0, -2.7, 0), x_dir=(1, 0, 0), z_dir=(0, 1, 0))):
        with Locations((-0.575, 31.8)):
            Rectangle(SKETCH43_W, SKETCH43_H)
    extrude(amount=-BOSS_EXTRUDE26_DEPTH)

    # Sketch44 → Boss-Extrude27 (add)
    with BuildSketch(Plane(origin=(0, -2.7, 0), x_dir=(1, 0, 0), z_dir=(0, 1, 0))):
        with Locations((-0.575, 36)):
            Rectangle(SKETCH44_W, SKETCH44_H)
    extrude(amount=BOSS_EXTRUDE27_DEPTH)

    # Sketch45 → Boss-Extrude30 (add)
    with BuildSketch(Plane(origin=(0, -2.7, 0), x_dir=(1, 0, 0), z_dir=(0, 1, 0)).offset(BOSS_EXTRUDE30_START)):
        with Locations((12.8, 31.8)):
            Rectangle(SKETCH45_W, SKETCH45_H)
    extrude(amount=BOSS_EXTRUDE30_DEPTH)

    # Sketch46 → Boss-Extrude31 (add)
    with BuildSketch(Plane(origin=(14.15, 0, 0), x_dir=(0, 0, -1), z_dir=(1, 0, 0))):
        Polygon((27.1, 5), (35.5, 17.3), (36.5, 17.3), (36.5, 5), align=None)
    extrude(amount=-BOSS_EXTRUDE31_DEPTH)

    # Sketch47 → Boss-Extrude32 (add)
    with BuildSketch(Plane(origin=(0, -2.7, 0), x_dir=(1, 0, 0), z_dir=(0, 1, 0))):
        with Locations((-11.35, 34.25)):
            Rectangle(SKETCH47_W, SKETCH47_H)
    extrude(amount=BOSS_EXTRUDE32_DEPTH)

    # Sketch48 → Cut-Extrude15 (cut)
    with BuildSketch(Plane(origin=(0, 0, -36.5), x_dir=(-1, 0, 0), z_dir=(0, 0, -1)).offset(CUT_EXTRUDE15_START)):
        with Locations(Location((8, 15.4, 0), (0, 0, 180))):
            Circle(SKETCH48_R)
        with Locations(Location((-8, 15.4, 0), (0, 0, 180))):
            Circle(SKETCH48_R)
        with Locations(Location((-8, -0.6, 0), (0, 0, 180))):
            Circle(SKETCH48_R)
        with Locations(Location((8, -0.6, 0), (0, 0, 180))):
            Circle(SKETCH48_R)
    extrude(amount=CUT_EXTRUDE15_DEPTH, mode=Mode.SUBTRACT)

    # Sketch49 → Boss-Extrude33 (add)
    with BuildSketch(Plane(origin=(0, -2.7, 0), x_dir=(1, 0, 0), z_dir=(0, 1, 0))):
        with Locations((-11.35, -0.25)):
            Rectangle(SKETCH49_W, SKETCH49_H)
    extrude(amount=BOSS_EXTRUDE33_DEPTH)

    # Chamfer1
    chamfer1_edges = [part.edges().sort_by_distance(p)[0] for p in [
        (6.95, -0.6, 36.5),
        (-9.05, 15.4, 36.5),
        (-9.05, -0.6, 36.5),
        (6.95, 15.4, 36.5),
        (-9.05, -0.6, -36.5),
        (6.95, -0.6, -36.5),
        (6.95, 15.4, -36.5),
        (-9.05, 15.4, -36.5),
    ]]
    chamfer(chamfer1_edges, length=CHAMFER1_SIZE)

    # Chamfer2
    chamfer2_edges = [part.edges().sort_by_distance(p)[0] for p in [
        (80.65, -2.7, 0),
    ]]
    chamfer(chamfer2_edges, length=CHAMFER2_SIZE - 0.0001)  # a hair under: the kernel refuses the full size

    # Chamfer3
    chamfer3_edges = [part.edges().sort_by_distance(p)[0] for p in [
        (71.95, 5, 25.75),
        (71.95, 5, -25.75),
    ]]
    chamfer(chamfer3_edges, length=CHAMFER3_SIZE)


solid = part.part
